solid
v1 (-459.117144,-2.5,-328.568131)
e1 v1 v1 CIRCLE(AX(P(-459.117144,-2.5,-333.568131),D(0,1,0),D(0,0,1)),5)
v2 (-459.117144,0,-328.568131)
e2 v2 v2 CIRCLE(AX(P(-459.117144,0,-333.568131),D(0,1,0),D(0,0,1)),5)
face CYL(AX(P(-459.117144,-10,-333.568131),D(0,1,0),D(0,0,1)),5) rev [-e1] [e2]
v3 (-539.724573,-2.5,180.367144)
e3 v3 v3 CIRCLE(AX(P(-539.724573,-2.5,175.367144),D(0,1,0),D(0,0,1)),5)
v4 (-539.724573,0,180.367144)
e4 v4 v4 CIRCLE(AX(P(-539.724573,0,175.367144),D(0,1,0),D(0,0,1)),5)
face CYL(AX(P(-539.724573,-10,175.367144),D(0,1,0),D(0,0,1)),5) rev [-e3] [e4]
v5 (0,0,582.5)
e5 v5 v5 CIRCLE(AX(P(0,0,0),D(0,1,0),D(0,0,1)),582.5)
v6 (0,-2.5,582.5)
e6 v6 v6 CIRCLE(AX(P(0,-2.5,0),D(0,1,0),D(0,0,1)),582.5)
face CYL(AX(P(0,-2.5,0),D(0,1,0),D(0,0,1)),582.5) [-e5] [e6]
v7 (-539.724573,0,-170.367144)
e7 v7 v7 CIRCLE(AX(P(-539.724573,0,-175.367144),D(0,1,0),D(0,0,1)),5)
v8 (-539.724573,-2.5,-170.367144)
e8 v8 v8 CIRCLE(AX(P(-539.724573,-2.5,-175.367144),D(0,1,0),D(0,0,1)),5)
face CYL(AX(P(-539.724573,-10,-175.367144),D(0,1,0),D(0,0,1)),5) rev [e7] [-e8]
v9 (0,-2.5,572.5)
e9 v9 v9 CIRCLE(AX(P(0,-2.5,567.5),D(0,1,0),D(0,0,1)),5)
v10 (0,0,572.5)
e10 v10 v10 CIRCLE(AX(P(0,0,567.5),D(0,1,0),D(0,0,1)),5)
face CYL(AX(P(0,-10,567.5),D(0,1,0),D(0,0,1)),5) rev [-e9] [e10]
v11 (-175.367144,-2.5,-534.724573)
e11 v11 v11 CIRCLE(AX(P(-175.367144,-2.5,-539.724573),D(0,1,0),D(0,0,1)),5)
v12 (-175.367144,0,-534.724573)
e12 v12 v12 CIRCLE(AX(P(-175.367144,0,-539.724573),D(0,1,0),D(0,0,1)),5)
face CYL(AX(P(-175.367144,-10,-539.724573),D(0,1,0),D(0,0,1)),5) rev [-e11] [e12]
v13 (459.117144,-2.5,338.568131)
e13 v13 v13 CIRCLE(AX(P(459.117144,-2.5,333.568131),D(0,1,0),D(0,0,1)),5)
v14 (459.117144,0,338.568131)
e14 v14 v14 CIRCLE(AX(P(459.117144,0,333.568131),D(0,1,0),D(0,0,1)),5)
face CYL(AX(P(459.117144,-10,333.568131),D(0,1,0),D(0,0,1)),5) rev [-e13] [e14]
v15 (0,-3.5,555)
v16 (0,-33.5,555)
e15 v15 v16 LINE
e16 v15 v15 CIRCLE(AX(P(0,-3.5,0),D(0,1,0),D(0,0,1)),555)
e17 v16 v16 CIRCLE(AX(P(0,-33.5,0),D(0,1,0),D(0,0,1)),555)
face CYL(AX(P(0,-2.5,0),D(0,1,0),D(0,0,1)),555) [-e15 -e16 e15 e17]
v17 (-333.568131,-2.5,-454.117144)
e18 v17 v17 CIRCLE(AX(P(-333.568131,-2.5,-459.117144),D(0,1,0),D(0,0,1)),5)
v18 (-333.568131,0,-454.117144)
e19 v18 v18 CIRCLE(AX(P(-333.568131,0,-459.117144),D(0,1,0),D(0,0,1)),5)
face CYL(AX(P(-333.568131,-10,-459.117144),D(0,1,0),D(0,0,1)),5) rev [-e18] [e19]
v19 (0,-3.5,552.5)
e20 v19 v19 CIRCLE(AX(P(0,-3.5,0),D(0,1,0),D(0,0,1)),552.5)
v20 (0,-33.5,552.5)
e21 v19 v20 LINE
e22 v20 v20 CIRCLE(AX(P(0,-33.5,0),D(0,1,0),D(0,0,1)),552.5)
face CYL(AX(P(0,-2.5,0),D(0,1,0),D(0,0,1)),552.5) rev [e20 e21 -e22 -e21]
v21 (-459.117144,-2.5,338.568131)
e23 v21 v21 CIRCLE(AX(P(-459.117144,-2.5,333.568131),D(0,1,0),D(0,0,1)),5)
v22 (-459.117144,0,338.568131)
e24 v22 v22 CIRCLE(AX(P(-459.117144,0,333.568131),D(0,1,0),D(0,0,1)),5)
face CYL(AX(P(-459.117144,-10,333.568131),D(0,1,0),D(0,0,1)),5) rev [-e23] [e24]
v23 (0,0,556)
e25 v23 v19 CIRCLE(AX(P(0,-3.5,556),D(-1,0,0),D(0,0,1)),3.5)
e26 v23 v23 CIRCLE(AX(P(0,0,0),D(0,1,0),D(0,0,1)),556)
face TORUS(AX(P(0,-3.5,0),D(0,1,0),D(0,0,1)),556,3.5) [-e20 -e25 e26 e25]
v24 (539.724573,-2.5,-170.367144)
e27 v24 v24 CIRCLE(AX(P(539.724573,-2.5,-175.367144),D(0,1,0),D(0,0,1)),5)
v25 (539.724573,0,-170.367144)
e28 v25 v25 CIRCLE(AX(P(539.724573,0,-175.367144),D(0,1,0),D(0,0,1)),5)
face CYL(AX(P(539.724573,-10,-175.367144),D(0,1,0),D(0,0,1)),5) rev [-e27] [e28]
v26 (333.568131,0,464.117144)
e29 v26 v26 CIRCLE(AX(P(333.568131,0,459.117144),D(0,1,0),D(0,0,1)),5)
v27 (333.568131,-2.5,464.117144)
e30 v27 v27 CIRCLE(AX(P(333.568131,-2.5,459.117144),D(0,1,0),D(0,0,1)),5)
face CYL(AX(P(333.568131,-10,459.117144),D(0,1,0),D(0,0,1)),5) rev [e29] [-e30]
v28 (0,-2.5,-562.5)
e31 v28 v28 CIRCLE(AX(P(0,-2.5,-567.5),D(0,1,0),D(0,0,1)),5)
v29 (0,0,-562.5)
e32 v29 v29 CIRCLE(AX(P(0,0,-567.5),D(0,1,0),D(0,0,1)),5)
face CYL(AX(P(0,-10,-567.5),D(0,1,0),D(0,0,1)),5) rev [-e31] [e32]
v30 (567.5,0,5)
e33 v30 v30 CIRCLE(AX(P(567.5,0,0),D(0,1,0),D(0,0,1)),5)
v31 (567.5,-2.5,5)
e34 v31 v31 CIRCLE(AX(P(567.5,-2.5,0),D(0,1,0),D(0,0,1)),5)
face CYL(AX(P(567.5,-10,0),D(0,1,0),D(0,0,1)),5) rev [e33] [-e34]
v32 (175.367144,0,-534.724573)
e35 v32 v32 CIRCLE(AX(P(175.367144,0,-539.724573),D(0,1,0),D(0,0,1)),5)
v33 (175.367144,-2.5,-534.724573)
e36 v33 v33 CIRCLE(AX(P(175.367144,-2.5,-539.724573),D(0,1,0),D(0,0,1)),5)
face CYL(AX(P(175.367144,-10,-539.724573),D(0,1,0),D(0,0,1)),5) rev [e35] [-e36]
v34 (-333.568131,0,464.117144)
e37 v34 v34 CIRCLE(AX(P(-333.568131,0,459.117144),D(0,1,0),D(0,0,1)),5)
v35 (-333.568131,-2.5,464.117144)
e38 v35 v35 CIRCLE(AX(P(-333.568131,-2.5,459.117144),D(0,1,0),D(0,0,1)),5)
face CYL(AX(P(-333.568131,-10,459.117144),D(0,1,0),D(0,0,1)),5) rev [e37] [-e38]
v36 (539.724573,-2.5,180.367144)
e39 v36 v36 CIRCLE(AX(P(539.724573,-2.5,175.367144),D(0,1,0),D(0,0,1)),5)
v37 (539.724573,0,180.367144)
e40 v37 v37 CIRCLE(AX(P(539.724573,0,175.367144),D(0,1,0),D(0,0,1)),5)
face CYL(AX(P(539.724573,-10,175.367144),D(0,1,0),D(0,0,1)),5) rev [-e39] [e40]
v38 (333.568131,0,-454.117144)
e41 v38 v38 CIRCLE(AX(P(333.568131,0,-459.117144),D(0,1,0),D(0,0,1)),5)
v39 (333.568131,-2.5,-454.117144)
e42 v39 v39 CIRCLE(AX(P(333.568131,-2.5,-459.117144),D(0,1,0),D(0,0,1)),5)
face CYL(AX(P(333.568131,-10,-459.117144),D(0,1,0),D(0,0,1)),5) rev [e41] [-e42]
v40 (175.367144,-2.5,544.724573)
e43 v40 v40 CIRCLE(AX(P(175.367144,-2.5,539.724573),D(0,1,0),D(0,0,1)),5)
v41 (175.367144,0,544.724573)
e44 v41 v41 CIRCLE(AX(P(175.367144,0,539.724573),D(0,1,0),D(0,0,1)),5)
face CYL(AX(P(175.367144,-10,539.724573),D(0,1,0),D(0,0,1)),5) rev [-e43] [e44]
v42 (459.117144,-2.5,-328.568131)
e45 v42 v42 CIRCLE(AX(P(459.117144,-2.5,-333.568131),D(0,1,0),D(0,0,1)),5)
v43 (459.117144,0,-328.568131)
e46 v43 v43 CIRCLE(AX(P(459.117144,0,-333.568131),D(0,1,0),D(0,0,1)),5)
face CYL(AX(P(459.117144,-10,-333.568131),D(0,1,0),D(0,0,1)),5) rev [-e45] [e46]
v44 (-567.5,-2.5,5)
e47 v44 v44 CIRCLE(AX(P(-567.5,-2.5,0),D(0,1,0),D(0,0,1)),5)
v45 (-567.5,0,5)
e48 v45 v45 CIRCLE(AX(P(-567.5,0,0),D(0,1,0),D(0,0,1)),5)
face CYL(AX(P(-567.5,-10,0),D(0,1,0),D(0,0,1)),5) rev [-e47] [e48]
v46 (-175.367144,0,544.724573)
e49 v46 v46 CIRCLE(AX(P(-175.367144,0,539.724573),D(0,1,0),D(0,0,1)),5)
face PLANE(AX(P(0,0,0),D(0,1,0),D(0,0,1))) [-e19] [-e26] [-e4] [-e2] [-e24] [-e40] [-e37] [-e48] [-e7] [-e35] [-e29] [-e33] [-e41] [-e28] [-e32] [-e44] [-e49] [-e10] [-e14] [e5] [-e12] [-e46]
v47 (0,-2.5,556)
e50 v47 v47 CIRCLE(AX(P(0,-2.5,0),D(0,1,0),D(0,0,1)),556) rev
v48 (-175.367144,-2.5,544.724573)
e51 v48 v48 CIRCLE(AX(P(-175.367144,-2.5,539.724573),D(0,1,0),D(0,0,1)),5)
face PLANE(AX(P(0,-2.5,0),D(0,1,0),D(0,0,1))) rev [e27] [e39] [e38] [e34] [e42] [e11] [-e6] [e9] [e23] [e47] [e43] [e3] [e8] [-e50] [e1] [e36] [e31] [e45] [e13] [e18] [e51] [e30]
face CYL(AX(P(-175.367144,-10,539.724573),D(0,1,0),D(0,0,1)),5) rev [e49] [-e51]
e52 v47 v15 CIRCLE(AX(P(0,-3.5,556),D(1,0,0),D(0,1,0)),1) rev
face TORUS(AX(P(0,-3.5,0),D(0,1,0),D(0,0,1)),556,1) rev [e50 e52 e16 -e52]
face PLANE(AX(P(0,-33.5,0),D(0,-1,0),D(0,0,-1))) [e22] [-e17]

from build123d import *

# Parameters (mm, degrees)
SKETCH1_R          = 582.5
SKETCH1_R_2        = 552.5
BASE_FLANGE1_DEPTH = 2.5
SKETCH8_R          = 5
CUT_EXTRUDE1_DEPTH = 10


# Read off the part's stored shape, not the designer's step: Edge-Flange1
# Sheet-metal steps are written as plain solids
with BuildPart() as part:
    # Sketch1 → Base-Flange1 (new body)
    with BuildSketch(Plane(origin=(0, 0, 0), x_dir=(1, 0, 0), z_dir=(0, 1, 0))):
        with Locations(Location((0, 0, 0), (0, 0, 270))):
            Circle(SKETCH1_R)
        with Locations(Location((0, 0, 0), (0, 0, 270))):
            Circle(SKETCH1_R_2, mode=Mode.SUBTRACT)
    extrude(amount=-BASE_FLANGE1_DEPTH)

    # Edge-Flange1 outline → Edge-Flange1 (revolve, cut)
    with BuildSketch(Plane.XY):
        with BuildLine():
            Line((552.5, -2.5), (552.645898034, -2.5))
            ThreePointArc((552.645898034, -2.5), (553.908349934, -0.69375696), (556, 0))
            Line((556, 0), (552.5, 0))
            Line((552.5, 0), (552.5, -2.5))
        make_face()
    revolve(axis=Axis((0, 0, 0), (0, 1, 0)), mode=Mode.SUBTRACT)

    # Edge-Flange1 2 outline → Edge-Flange1 2 (revolve)
    with BuildSketch(Plane.XY):
        with BuildLine():
            Line((552.5, -3.5), (552.5, -33.5))
            Line((552.5, -33.5), (555, -33.5))
            Line((555, -33.5), (555, -3.5))
            ThreePointArc((555, -3.5), (555.292893219, -2.792893219), (556, -2.5))
            Line((556, -2.5), (552.645898034, -2.5))
            ThreePointArc((552.645898034, -2.5), (552.536666571, -2.994706462), (552.5, -3.5))
        make_face()
    revolve(axis=Axis((0, 0, 0), (0, 1, 0)))

    # Sketch8 → Cut-Extrude1 (cut)
    with BuildSketch(Plane(origin=(0, 0, 0), x_dir=(1, 0, 0), z_dir=(0, 1, 0))):
        with Locations(Location((175.367144308, 539.724572998, 0), (0, 0, 270))):
            Circle(SKETCH8_R)
        with Locations(Location((333.568130676, 459.117144308, 0), (0, 0, 270))):
            Circle(SKETCH8_R)
        with Locations(Location((0, 567.5, 0), (0, 0, 270))):
            Circle(SKETCH8_R)
        with Locations(Location((459.117144308, 333.568130676, 0), (0, 0, 270))):
            Circle(SKETCH8_R)
        with Locations(Location((539.724572998, 175.367144308, 0), (0, 0, 270))):
            Circle(SKETCH8_R)
        with Locations(Location((567.5, 0, 0), (0, 0, 270))):
            Circle(SKETCH8_R)
        with Locations(Location((539.724572998, -175.367144308, 0), (0, 0, 270))):
            Circle(SKETCH8_R)
        with Locations(Location((459.117144308, -333.568130676, 0), (0, 0, 270))):
            Circle(SKETCH8_R)
        with Locations(Location((333.568130676, -459.117144308, 0), (0, 0, 270))):
            Circle(SKETCH8_R)
        with Locations(Location((175.367144308, -539.724572997, 0), (0, 0, 270))):
            Circle(SKETCH8_R)
        with Locations(Location((0, -567.5, 0), (0, 0, 270))):
            Circle(SKETCH8_R)
        with Locations(Location((-175.367144308, -539.724572998, 0), (0, 0, 270))):
            Circle(SKETCH8_R)
        with Locations(Location((-333.568130676, -459.117144308, 0), (0, 0, 270))):
            Circle(SKETCH8_R)
        with Locations(Location((-459.117144308, -333.568130676, 0), (0, 0, 270))):
            Circle(SKETCH8_R)
        with Locations(Location((-539.724572997, -175.367144308, 0), (0, 0, 270))):
            Circle(SKETCH8_R)
        with Locations(Location((-567.5, 0, 0), (0, 0, 270))):
            Circle(SKETCH8_R)
        with Locations(Location((-539.724572997, 175.367144308, 0), (0, 0, 270))):
            Circle(SKETCH8_R)
        with Locations(Location((-459.117144308, 333.568130676, 0), (0, 0, 270))):
            Circle(SKETCH8_R)
        with Locations(Location((-333.568130676, 459.117144308, 0), (0, 0, 270))):
            Circle(SKETCH8_R)
        with Locations(Location((-175.367144308, 539.724572997, 0), (0, 0, 270))):
            Circle(SKETCH8_R)
    extrude(amount=-CUT_EXTRUDE1_DEPTH, mode=Mode.SUBTRACT)


solid = part.part
